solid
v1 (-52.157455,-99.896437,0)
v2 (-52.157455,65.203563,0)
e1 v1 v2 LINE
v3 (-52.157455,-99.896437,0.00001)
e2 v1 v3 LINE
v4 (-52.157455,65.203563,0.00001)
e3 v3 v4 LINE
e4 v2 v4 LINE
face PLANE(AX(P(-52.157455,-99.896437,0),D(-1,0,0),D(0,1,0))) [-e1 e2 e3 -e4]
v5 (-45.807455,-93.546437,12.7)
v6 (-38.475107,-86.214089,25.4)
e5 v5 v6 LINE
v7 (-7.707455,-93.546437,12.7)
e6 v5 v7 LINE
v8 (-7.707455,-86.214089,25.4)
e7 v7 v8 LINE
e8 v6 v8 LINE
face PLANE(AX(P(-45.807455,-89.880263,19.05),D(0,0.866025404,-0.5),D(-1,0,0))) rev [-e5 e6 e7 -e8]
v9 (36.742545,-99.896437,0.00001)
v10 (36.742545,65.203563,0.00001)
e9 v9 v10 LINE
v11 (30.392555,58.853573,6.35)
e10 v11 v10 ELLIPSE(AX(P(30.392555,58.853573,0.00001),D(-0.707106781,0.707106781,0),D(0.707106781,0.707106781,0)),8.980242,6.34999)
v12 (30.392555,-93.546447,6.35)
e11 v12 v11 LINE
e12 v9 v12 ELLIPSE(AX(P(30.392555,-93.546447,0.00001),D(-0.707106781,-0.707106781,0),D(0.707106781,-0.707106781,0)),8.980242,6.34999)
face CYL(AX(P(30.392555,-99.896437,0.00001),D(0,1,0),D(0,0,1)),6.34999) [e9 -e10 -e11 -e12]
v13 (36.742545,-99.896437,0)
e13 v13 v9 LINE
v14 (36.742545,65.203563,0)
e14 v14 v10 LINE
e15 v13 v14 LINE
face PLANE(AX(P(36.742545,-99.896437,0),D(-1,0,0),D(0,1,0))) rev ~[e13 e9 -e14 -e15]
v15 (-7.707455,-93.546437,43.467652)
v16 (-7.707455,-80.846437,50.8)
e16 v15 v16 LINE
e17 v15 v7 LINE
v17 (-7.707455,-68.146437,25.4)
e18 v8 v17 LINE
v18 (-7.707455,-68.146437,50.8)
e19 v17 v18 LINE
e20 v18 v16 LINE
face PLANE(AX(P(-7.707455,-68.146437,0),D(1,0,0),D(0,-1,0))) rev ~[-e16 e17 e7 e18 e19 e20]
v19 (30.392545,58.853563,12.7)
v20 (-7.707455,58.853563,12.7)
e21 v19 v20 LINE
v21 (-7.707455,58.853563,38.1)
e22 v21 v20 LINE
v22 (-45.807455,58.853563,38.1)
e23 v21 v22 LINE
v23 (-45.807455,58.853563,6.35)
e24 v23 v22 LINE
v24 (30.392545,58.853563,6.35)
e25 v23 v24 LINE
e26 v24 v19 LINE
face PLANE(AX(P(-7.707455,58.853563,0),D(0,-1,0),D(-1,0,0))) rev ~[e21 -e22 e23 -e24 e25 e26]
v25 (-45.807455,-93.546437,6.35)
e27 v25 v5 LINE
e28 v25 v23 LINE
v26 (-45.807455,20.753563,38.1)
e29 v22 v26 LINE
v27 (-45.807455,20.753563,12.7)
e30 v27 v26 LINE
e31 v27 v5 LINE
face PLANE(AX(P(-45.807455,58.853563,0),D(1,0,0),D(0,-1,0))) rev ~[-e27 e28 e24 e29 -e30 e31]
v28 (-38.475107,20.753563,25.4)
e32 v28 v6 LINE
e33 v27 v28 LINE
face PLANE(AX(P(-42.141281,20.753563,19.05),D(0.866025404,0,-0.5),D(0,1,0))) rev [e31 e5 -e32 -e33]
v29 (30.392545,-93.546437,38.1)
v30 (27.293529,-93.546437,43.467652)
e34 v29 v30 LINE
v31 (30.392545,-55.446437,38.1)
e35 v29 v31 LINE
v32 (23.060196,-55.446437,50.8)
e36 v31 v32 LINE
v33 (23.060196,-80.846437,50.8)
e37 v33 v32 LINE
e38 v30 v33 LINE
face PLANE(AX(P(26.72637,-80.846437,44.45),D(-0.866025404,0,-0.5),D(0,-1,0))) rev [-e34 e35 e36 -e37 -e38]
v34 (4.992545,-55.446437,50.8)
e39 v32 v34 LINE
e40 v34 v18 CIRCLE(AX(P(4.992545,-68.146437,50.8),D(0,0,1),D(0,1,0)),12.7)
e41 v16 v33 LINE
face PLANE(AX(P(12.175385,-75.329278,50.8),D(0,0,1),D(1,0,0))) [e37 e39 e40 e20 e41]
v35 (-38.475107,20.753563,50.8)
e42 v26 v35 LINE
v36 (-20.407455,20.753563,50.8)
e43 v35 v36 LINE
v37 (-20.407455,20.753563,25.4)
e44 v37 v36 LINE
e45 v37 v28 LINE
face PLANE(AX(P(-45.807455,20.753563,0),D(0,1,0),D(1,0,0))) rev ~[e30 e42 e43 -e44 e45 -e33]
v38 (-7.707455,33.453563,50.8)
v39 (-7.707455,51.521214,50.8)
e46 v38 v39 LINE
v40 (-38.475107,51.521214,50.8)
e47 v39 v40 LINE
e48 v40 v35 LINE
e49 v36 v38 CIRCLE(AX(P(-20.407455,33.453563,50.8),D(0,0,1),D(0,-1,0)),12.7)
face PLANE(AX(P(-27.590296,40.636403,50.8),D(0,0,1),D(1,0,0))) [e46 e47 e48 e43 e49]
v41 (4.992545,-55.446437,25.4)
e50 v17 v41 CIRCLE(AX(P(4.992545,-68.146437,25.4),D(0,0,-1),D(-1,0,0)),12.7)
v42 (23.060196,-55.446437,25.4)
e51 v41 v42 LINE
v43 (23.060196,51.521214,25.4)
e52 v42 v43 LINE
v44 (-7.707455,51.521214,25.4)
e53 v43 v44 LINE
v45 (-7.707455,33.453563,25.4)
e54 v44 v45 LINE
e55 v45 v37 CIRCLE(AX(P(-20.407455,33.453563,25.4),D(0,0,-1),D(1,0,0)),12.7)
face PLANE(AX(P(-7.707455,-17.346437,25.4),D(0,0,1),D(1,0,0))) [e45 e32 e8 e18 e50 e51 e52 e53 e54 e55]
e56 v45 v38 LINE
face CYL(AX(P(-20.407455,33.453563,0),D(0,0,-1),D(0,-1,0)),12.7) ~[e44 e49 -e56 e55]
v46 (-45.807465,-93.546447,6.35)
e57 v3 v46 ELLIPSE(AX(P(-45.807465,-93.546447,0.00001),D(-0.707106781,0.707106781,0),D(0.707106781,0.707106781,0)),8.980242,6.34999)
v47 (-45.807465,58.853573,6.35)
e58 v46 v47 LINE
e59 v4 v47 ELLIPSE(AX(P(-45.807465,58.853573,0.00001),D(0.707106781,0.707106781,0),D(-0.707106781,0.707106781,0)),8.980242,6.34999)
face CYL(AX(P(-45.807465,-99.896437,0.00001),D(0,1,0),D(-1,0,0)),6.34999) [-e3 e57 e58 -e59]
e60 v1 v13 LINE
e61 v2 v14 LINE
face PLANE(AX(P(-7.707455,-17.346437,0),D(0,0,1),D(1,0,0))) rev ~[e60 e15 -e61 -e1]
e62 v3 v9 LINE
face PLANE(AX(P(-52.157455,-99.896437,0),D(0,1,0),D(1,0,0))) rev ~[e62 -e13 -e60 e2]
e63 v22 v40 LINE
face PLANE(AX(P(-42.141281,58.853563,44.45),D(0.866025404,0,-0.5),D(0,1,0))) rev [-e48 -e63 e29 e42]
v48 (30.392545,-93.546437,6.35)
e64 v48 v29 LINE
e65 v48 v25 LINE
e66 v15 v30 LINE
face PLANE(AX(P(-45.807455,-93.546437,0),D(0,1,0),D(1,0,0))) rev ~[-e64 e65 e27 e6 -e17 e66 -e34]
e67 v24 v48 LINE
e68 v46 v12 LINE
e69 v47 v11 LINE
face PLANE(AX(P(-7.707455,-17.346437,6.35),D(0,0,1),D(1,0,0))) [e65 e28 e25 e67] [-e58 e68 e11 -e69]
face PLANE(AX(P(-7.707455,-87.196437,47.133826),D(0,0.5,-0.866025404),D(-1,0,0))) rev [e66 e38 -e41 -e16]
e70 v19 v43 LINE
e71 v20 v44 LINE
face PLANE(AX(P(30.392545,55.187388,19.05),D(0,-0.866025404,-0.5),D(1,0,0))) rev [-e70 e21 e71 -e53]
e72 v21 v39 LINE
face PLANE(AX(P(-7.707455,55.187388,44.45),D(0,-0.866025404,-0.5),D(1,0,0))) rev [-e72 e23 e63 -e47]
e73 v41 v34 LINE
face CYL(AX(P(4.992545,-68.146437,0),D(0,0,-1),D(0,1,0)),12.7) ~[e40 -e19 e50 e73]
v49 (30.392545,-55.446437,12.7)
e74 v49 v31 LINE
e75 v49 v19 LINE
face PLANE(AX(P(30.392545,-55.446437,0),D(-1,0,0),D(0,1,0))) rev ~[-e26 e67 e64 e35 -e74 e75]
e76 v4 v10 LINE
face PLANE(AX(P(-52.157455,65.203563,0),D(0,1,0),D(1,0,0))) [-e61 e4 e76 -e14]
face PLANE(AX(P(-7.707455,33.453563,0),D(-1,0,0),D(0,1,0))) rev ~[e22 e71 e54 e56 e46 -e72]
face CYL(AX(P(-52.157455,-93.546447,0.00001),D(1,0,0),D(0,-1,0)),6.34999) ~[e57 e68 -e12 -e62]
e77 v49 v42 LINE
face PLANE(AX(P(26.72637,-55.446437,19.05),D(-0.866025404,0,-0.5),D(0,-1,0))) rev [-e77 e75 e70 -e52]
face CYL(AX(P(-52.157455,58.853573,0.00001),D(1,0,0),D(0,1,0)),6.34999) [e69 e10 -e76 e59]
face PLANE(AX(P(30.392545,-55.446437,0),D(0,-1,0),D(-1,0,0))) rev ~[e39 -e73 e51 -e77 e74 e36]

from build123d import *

# Parameters (mm, degrees)
F1_DEPTH    = 25.4
F2_DEPTH    = 50.8
F0_W        = 88.9
F0_H        = 165.1
F3_DEPTH    = 6.35
F4_R        = 6.34999
F5_SIZE2    = 7.3323484187
F5_SIZE     = 12.7
F6_C1_SIZE2 = 7.3323484187
F6_C1_SIZE  = 12.7
F6_C2_SIZE2 = 12.7
F6_C2_SIZE  = 7.3323484187
F6_C3_SIZE2 = 7.3323484187
F6_C3_SIZE  = 12.7
F6_C4_SIZE2 = 7.3323484187
F6_C4_SIZE  = 12.7


# Not quite as in the source:
# - a fillet or chamfer is up to 0.001 mm smaller than in the source, because OpenCascade refuses the exact size


with BuildPart() as f1:
    # F0 (on Top) → F1 (new body)
    with BuildSketch(Plane.XY):
        with BuildLine():
            Line((30.3925445665, 58.8535625324), (-7.7074554335, 58.8535625324))
            Line((-7.7074554335, 58.8535625324), (-7.7074554335, 33.4535625324))
            ThreePointArc((-7.7074554335, 33.4535625324), (-11.4271993125, 24.4733064113), (-20.4074554335, 20.7535625324))
            Line((-20.4074554335, 20.7535625324), (-45.8074554335, 20.7535625324))
            Line((-45.8074554335, 20.7535625324), (-45.8074554335, -93.5464374676))
            Line((-45.8074554335, -93.5464374676), (-7.7074554335, -93.5464374676))
            Line((-7.7074554335, -93.5464374676), (-7.7074554335, -68.1464374676))
            ThreePointArc((-7.7074554335, -68.1464374676), (-3.9877115546, -59.1661813466), (4.9925445665, -55.4464374676))
            Line((4.9925445665, -55.4464374676), (30.3925445665, -55.4464374676))
            Line((30.3925445665, -55.4464374676), (30.3925445665, 58.8535625324))
        make_face()
    extrude(amount=F1_DEPTH)

    # F0 (on Top) → F2 (join)
    with BuildSketch(Plane.XY):
        with BuildLine():
            Line((-7.7074554335, 58.8535625324), (-45.8074554335, 58.8535625324))
            Line((-45.8074554335, 58.8535625324), (-45.8074554335, 20.7535625324))
            Line((-45.8074554335, 20.7535625324), (-20.4074554335, 20.7535625324))
            ThreePointArc((-20.4074554335, 20.7535625324), (-11.4271993125, 24.4733064113), (-7.7074554335, 33.4535625324))
            Line((-7.7074554335, 33.4535625324), (-7.7074554335, 58.8535625324))
        make_face()
        with BuildLine():
            Line((30.3925445665, -93.5464374676), (30.3925445665, -55.4464374676))
            Line((30.3925445665, -55.4464374676), (4.9925445665, -55.4464374676))
            ThreePointArc((4.9925445665, -55.4464374676), (-3.9877115546, -59.1661813466), (-7.7074554335, -68.1464374676))
            Line((-7.7074554335, -68.1464374676), (-7.7074554335, -93.5464374676))
            Line((-7.7074554335, -93.5464374676), (30.3925445665, -93.5464374676))
        make_face()
    extrude(amount=F2_DEPTH)

    # F0 (on Top) → F3 (join)
    with BuildSketch(Plane.XY):
        with Locations((-7.7074554335, -17.3464374676)):
            Rectangle(F0_W, F0_H)
        Polygon((-45.8074554335, 20.7535625324), (-45.8074554335, 58.8535625324), (-7.7074554335, 58.8535625324), (30.3925445665, 58.8535625324), (30.3925445665, -55.4464374676), (30.3925445665, -93.5464374676), (-7.7074554335, -93.5464374676), (-45.8074554335, -93.5464374676), align=None, mode=Mode.SUBTRACT)
    extrude(amount=F3_DEPTH)

    # F4 (radius 6.35 in the source; OpenCascade refuses exactly that, so slightly less here)
    f4_edges = [f1.edges().sort_by_distance(p)[0] for p in [
        (-7.707455, -99.896437, 6.35),
        (-52.157455, -17.346437, 6.35),
        (36.742545, -17.346437, 6.35),
        (-7.707455, 65.203563, 6.35),
    ]]
    fillet(f4_edges, radius=F4_R)

    # F5
    f5_edges = [f1.edges().sort_by_distance(p)[0] for p in [
        (30.392545, 1.703563, 25.4),
        (11.342545, 58.853563, 25.4),
        (-45.807455, -36.396437, 25.4),
        (-26.757455, -93.546437, 25.4),
    ]]
    chamfer(f5_edges, length=F5_SIZE, length2=F5_SIZE2)

    # F6: chamfer of 12.7 x 7.3323484187 on 4 edges, made by hand

    # F6_c1
    f6_c1_edges = [f1.edges().sort_by_distance(p)[0] for p in [
        (-45.8074554335, 39.8035625324, 50.8),
    ]]
    f6_c1_side = f1.faces().sort_by_distance((-45.8074554335, 39.8035625324, 50.6533530316))[0]
    chamfer(f6_c1_edges, length=F6_C1_SIZE, length2=F6_C1_SIZE2, reference=f6_c1_side)

    # F6_c2
    f6_c2_edges = [f1.edges().sort_by_distance(p)[0] for p in [
        (11.3425445665, -93.5464374676, 50.8),
    ]]
    f6_c2_side = f1.faces().sort_by_distance((11.3425445665, -93.5464374676, 50.6533530316))[0]
    chamfer(f6_c2_edges, length=F6_C2_SIZE, length2=F6_C2_SIZE2, reference=f6_c2_side)

    # F6_c3
    f6_c3_edges = [f1.edges().sort_by_distance(p)[0] for p in [
        (-23.0912812242, 58.8535625324, 50.8),
    ]]
    f6_c3_side = f1.faces().sort_by_distance((-23.0912812242, 58.8535625324, 50.6533530316))[0]
    chamfer(f6_c3_edges, length=F6_C3_SIZE, length2=F6_C3_SIZE2, reference=f6_c3_side)

    # F6_c4
    f6_c4_edges = [f1.edges().sort_by_distance(p)[0] for p in [
        (30.3925445665, -68.1464374676, 50.8),
    ]]
    f6_c4_side = f1.faces().sort_by_distance((30.3925445665, -68.1464374676, 50.6533530316))[0]
    chamfer(f6_c4_edges, length=F6_C4_SIZE, length2=F6_C4_SIZE2, reference=f6_c4_side)


solid = f1.part
